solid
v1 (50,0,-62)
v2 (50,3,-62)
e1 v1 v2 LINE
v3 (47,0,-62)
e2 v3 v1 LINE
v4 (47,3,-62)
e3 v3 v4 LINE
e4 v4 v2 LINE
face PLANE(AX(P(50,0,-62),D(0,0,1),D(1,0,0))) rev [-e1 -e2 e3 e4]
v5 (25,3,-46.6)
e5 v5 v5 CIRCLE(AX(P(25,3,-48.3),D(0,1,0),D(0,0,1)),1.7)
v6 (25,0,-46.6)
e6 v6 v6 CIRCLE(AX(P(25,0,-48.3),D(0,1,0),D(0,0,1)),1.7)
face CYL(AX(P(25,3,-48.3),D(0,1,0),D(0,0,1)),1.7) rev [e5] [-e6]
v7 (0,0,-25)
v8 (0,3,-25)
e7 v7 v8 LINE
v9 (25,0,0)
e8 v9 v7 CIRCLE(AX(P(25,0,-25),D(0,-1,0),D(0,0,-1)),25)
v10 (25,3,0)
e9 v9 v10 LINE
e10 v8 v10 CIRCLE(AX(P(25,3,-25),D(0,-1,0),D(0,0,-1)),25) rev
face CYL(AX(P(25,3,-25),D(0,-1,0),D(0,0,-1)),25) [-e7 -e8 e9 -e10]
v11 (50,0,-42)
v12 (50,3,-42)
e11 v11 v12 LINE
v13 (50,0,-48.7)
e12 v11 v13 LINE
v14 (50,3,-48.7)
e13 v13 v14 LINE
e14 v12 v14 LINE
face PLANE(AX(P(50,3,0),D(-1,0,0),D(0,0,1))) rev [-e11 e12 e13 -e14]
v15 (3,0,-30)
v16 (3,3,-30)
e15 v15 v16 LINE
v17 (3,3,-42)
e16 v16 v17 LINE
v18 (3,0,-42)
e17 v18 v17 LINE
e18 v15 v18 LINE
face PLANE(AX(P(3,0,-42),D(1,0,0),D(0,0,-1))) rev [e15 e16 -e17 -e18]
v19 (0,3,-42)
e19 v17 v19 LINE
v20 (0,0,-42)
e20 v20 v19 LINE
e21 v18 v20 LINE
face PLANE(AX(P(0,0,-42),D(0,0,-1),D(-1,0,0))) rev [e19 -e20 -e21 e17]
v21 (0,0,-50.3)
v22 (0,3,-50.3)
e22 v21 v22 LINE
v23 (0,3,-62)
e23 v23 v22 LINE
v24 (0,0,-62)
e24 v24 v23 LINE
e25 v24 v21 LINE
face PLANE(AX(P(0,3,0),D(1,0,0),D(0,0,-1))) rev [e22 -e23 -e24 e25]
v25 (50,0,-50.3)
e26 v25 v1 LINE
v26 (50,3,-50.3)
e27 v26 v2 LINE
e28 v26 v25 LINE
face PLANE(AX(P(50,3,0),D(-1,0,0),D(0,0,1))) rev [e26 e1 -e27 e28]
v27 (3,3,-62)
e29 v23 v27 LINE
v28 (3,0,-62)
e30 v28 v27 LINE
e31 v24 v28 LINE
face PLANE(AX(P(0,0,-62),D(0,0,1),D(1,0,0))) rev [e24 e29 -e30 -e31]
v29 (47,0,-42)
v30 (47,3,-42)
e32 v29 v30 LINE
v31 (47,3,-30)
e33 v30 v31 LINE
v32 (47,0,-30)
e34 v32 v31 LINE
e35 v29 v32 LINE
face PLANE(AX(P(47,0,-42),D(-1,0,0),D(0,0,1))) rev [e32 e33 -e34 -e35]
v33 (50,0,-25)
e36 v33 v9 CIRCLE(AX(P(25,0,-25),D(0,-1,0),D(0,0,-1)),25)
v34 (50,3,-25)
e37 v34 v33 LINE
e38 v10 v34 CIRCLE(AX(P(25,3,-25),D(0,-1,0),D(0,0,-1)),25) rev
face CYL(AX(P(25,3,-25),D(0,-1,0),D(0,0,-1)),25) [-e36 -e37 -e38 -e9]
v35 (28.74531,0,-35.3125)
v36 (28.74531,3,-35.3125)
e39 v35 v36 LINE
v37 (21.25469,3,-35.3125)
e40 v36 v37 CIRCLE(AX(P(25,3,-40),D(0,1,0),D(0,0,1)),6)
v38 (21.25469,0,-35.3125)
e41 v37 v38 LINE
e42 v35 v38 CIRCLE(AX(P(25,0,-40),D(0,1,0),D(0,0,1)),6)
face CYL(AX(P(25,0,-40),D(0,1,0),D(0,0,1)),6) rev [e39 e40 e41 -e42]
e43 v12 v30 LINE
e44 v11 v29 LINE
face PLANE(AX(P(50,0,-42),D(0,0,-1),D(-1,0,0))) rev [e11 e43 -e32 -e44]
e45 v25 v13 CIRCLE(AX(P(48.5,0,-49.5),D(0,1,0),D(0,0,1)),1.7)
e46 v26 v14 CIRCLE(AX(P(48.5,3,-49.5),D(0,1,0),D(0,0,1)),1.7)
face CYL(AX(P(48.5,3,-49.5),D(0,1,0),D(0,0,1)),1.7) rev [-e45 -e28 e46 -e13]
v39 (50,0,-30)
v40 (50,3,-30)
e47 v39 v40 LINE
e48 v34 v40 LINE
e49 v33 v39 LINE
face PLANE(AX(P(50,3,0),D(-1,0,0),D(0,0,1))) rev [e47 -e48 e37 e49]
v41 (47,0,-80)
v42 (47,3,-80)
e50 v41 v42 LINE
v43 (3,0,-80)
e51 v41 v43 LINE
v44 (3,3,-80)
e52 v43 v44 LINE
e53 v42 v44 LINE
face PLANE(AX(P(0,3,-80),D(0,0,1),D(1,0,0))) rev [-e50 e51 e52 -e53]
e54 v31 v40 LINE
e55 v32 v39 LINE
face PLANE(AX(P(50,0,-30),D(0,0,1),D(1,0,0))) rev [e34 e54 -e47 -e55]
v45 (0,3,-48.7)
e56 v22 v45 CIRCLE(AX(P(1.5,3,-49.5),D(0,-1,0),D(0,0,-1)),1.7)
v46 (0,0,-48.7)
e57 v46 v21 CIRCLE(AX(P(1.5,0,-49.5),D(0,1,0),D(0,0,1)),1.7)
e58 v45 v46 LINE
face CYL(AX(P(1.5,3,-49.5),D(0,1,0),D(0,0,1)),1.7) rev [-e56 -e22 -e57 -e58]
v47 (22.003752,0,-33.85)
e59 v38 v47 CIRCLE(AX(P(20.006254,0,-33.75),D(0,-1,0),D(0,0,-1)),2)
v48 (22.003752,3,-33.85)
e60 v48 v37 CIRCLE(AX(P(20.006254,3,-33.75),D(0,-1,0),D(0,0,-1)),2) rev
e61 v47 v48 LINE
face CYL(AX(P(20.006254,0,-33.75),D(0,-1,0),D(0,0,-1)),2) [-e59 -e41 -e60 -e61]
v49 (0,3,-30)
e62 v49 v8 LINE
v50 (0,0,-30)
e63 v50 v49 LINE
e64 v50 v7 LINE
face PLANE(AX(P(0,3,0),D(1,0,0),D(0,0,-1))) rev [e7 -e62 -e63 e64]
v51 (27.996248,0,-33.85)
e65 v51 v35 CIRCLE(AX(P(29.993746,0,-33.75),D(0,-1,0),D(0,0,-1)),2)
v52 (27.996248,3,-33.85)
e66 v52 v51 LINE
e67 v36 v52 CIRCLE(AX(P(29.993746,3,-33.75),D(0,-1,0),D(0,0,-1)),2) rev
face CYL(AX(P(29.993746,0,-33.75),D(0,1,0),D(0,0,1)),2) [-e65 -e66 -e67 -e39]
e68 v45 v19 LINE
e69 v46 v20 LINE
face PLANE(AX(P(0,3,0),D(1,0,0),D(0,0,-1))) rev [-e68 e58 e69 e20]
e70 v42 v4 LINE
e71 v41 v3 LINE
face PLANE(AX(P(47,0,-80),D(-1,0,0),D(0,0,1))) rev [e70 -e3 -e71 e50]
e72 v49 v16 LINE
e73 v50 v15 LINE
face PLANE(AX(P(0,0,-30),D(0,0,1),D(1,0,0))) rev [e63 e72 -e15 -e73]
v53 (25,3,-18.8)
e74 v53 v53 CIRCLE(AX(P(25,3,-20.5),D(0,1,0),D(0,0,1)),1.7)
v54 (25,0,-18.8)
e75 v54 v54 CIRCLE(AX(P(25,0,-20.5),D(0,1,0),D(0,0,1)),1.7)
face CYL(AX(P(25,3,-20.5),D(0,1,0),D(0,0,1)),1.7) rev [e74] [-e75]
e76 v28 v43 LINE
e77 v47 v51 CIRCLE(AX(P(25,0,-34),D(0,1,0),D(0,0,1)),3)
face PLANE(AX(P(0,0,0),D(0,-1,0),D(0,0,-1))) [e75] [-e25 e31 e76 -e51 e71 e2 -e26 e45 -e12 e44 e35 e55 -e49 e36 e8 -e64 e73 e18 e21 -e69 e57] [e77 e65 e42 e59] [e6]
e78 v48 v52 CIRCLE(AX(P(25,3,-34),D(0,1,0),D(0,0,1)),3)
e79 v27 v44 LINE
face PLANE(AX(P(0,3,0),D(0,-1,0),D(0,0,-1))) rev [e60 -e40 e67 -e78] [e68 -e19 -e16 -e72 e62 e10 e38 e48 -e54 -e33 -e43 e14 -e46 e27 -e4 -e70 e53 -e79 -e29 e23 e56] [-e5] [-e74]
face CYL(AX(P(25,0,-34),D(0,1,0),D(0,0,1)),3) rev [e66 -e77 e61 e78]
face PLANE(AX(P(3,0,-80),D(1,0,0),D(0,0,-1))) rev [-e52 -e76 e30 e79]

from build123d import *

# Parameters (mm, degrees)
SKETCH2_W                = 50
SKETCH2_H                = 80
BOSS_EXTRUDE1_DEPTH      = 3
M4_CLEARANCE_HOLE1_D     = 4.5
M4_CLEARANCE_HOLE1_DEPTH = 3
M4_CLEARANCE_HOLE1_TIP   = 1.351936393
SKETCH5_R                = 6
CUT_EXTRUDE1_DEPTH       = 3
SKETCH6_R                = 3
CUT_EXTRUDE2_DEPTH       = 3
FILLET1_R                = 2
FILLET2_R                = 25
SKETCH7_W                = 3
SKETCH7_H                = 18
SKETCH7_H_2              = 12
CUT_EXTRUDE3_DEPTH       = 3
M3_CLEARANCE_HOLE1_D     = 3.4
M3_CLEARANCE_HOLE1_DEPTH = 3
M3_CLEARANCE_HOLE1_TIP   = 1.021463052
M3_CLEARANCE_HOLE2_D     = 3.4


with BuildPart() as part:
    # Sketch2 → Boss-Extrude1 (new body)
    with BuildSketch(Plane(origin=(0, 0, 0), x_dir=(1, 0, 0), z_dir=(0, 1, 0))):
        with Locations((25, 40)):
            Rectangle(SKETCH2_W, SKETCH2_H)
    extrude(amount=BOSS_EXTRUDE1_DEPTH)

    # M4 Clearance Hole1
    with Locations(Plane(origin=(0, 3, 0), x_dir=(1, 0, 0), z_dir=(0, 1, 0))):
        with Locations((25, 40)):
            Hole(M4_CLEARANCE_HOLE1_D / 2, depth=M4_CLEARANCE_HOLE1_DEPTH)
            with Locations((0, 0, -(M4_CLEARANCE_HOLE1_DEPTH + M4_CLEARANCE_HOLE1_TIP / 2))):  # 118° drill point
                Cone(0, M4_CLEARANCE_HOLE1_D / 2, M4_CLEARANCE_HOLE1_TIP, mode=Mode.SUBTRACT)

    # Sketch5 → Cut-Extrude1 (cut)
    with BuildSketch(Plane(origin=(0, 3, 0), x_dir=(1, 0, 0), z_dir=(0, 1, 0))):
        with Locations(Location((25, 40, 0), (0, 0, 270))):
            Circle(SKETCH5_R)
    extrude(amount=-CUT_EXTRUDE1_DEPTH, mode=Mode.SUBTRACT)

    # Sketch6 → Cut-Extrude2 (cut)
    with BuildSketch(Plane(origin=(0, 3, 0), x_dir=(1, 0, 0), z_dir=(0, 1, 0))):
        with Locations((25, 34)):
            Circle(SKETCH6_R)
    extrude(amount=-CUT_EXTRUDE2_DEPTH, mode=Mode.SUBTRACT)

    # Fillet1
    fillet1_edges = [part.edges().sort_by_distance(p)[0] for p in [
        (22.09526249, 1.5, -34.75),
        (27.90473751, 1.5, -34.75),
    ]]
    fillet(fillet1_edges, radius=FILLET1_R)

    # Fillet2
    fillet2_edges = [part.edges().sort_by_distance(p)[0] for p in [
        (0, 1.5, 0),
        (50, 1.5, 0),
    ]]
    fillet(fillet2_edges, radius=FILLET2_R - 0.0001)  # a hair under: the kernel refuses the full size

    # Sketch7 → Cut-Extrude3 (cut)
    with BuildSketch(Plane(origin=(0, 3, 0), x_dir=(1, 0, 0), z_dir=(0, 1, 0))):
        with Locations((48.5, 71)):
            Rectangle(SKETCH7_W, SKETCH7_H)
        with Locations((1.5, 71)):
            Rectangle(SKETCH7_W, SKETCH7_H)
        with Locations((48.5, 36)):
            Rectangle(SKETCH7_W, SKETCH7_H_2)
        with Locations((1.5, 36)):
            Rectangle(SKETCH7_W, SKETCH7_H_2)
    extrude(amount=-CUT_EXTRUDE3_DEPTH, mode=Mode.SUBTRACT)

    # M3 Clearance Hole1
    with Locations(Plane(origin=(0, 3, 0), x_dir=(1, 0, 0), z_dir=(0, 1, 0))):
        with Locations((25, 48.3), (25, 20.5)):
            Hole(M3_CLEARANCE_HOLE1_D / 2, depth=M3_CLEARANCE_HOLE1_DEPTH)
            with Locations((0, 0, -(M3_CLEARANCE_HOLE1_DEPTH + M3_CLEARANCE_HOLE1_TIP / 2))):  # 118° drill point
                Cone(0, M3_CLEARANCE_HOLE1_D / 2, M3_CLEARANCE_HOLE1_TIP, mode=Mode.SUBTRACT)

    # M3 Clearance Hole2 (through all)
    with Locations(Plane(origin=(0, 3, 0), x_dir=(1, 0, 0), z_dir=(0, 1, 0))):
        with Locations((1.5, 49.5), (48.5, 49.5)):
            Hole(M3_CLEARANCE_HOLE2_D / 2)


solid = part.part
